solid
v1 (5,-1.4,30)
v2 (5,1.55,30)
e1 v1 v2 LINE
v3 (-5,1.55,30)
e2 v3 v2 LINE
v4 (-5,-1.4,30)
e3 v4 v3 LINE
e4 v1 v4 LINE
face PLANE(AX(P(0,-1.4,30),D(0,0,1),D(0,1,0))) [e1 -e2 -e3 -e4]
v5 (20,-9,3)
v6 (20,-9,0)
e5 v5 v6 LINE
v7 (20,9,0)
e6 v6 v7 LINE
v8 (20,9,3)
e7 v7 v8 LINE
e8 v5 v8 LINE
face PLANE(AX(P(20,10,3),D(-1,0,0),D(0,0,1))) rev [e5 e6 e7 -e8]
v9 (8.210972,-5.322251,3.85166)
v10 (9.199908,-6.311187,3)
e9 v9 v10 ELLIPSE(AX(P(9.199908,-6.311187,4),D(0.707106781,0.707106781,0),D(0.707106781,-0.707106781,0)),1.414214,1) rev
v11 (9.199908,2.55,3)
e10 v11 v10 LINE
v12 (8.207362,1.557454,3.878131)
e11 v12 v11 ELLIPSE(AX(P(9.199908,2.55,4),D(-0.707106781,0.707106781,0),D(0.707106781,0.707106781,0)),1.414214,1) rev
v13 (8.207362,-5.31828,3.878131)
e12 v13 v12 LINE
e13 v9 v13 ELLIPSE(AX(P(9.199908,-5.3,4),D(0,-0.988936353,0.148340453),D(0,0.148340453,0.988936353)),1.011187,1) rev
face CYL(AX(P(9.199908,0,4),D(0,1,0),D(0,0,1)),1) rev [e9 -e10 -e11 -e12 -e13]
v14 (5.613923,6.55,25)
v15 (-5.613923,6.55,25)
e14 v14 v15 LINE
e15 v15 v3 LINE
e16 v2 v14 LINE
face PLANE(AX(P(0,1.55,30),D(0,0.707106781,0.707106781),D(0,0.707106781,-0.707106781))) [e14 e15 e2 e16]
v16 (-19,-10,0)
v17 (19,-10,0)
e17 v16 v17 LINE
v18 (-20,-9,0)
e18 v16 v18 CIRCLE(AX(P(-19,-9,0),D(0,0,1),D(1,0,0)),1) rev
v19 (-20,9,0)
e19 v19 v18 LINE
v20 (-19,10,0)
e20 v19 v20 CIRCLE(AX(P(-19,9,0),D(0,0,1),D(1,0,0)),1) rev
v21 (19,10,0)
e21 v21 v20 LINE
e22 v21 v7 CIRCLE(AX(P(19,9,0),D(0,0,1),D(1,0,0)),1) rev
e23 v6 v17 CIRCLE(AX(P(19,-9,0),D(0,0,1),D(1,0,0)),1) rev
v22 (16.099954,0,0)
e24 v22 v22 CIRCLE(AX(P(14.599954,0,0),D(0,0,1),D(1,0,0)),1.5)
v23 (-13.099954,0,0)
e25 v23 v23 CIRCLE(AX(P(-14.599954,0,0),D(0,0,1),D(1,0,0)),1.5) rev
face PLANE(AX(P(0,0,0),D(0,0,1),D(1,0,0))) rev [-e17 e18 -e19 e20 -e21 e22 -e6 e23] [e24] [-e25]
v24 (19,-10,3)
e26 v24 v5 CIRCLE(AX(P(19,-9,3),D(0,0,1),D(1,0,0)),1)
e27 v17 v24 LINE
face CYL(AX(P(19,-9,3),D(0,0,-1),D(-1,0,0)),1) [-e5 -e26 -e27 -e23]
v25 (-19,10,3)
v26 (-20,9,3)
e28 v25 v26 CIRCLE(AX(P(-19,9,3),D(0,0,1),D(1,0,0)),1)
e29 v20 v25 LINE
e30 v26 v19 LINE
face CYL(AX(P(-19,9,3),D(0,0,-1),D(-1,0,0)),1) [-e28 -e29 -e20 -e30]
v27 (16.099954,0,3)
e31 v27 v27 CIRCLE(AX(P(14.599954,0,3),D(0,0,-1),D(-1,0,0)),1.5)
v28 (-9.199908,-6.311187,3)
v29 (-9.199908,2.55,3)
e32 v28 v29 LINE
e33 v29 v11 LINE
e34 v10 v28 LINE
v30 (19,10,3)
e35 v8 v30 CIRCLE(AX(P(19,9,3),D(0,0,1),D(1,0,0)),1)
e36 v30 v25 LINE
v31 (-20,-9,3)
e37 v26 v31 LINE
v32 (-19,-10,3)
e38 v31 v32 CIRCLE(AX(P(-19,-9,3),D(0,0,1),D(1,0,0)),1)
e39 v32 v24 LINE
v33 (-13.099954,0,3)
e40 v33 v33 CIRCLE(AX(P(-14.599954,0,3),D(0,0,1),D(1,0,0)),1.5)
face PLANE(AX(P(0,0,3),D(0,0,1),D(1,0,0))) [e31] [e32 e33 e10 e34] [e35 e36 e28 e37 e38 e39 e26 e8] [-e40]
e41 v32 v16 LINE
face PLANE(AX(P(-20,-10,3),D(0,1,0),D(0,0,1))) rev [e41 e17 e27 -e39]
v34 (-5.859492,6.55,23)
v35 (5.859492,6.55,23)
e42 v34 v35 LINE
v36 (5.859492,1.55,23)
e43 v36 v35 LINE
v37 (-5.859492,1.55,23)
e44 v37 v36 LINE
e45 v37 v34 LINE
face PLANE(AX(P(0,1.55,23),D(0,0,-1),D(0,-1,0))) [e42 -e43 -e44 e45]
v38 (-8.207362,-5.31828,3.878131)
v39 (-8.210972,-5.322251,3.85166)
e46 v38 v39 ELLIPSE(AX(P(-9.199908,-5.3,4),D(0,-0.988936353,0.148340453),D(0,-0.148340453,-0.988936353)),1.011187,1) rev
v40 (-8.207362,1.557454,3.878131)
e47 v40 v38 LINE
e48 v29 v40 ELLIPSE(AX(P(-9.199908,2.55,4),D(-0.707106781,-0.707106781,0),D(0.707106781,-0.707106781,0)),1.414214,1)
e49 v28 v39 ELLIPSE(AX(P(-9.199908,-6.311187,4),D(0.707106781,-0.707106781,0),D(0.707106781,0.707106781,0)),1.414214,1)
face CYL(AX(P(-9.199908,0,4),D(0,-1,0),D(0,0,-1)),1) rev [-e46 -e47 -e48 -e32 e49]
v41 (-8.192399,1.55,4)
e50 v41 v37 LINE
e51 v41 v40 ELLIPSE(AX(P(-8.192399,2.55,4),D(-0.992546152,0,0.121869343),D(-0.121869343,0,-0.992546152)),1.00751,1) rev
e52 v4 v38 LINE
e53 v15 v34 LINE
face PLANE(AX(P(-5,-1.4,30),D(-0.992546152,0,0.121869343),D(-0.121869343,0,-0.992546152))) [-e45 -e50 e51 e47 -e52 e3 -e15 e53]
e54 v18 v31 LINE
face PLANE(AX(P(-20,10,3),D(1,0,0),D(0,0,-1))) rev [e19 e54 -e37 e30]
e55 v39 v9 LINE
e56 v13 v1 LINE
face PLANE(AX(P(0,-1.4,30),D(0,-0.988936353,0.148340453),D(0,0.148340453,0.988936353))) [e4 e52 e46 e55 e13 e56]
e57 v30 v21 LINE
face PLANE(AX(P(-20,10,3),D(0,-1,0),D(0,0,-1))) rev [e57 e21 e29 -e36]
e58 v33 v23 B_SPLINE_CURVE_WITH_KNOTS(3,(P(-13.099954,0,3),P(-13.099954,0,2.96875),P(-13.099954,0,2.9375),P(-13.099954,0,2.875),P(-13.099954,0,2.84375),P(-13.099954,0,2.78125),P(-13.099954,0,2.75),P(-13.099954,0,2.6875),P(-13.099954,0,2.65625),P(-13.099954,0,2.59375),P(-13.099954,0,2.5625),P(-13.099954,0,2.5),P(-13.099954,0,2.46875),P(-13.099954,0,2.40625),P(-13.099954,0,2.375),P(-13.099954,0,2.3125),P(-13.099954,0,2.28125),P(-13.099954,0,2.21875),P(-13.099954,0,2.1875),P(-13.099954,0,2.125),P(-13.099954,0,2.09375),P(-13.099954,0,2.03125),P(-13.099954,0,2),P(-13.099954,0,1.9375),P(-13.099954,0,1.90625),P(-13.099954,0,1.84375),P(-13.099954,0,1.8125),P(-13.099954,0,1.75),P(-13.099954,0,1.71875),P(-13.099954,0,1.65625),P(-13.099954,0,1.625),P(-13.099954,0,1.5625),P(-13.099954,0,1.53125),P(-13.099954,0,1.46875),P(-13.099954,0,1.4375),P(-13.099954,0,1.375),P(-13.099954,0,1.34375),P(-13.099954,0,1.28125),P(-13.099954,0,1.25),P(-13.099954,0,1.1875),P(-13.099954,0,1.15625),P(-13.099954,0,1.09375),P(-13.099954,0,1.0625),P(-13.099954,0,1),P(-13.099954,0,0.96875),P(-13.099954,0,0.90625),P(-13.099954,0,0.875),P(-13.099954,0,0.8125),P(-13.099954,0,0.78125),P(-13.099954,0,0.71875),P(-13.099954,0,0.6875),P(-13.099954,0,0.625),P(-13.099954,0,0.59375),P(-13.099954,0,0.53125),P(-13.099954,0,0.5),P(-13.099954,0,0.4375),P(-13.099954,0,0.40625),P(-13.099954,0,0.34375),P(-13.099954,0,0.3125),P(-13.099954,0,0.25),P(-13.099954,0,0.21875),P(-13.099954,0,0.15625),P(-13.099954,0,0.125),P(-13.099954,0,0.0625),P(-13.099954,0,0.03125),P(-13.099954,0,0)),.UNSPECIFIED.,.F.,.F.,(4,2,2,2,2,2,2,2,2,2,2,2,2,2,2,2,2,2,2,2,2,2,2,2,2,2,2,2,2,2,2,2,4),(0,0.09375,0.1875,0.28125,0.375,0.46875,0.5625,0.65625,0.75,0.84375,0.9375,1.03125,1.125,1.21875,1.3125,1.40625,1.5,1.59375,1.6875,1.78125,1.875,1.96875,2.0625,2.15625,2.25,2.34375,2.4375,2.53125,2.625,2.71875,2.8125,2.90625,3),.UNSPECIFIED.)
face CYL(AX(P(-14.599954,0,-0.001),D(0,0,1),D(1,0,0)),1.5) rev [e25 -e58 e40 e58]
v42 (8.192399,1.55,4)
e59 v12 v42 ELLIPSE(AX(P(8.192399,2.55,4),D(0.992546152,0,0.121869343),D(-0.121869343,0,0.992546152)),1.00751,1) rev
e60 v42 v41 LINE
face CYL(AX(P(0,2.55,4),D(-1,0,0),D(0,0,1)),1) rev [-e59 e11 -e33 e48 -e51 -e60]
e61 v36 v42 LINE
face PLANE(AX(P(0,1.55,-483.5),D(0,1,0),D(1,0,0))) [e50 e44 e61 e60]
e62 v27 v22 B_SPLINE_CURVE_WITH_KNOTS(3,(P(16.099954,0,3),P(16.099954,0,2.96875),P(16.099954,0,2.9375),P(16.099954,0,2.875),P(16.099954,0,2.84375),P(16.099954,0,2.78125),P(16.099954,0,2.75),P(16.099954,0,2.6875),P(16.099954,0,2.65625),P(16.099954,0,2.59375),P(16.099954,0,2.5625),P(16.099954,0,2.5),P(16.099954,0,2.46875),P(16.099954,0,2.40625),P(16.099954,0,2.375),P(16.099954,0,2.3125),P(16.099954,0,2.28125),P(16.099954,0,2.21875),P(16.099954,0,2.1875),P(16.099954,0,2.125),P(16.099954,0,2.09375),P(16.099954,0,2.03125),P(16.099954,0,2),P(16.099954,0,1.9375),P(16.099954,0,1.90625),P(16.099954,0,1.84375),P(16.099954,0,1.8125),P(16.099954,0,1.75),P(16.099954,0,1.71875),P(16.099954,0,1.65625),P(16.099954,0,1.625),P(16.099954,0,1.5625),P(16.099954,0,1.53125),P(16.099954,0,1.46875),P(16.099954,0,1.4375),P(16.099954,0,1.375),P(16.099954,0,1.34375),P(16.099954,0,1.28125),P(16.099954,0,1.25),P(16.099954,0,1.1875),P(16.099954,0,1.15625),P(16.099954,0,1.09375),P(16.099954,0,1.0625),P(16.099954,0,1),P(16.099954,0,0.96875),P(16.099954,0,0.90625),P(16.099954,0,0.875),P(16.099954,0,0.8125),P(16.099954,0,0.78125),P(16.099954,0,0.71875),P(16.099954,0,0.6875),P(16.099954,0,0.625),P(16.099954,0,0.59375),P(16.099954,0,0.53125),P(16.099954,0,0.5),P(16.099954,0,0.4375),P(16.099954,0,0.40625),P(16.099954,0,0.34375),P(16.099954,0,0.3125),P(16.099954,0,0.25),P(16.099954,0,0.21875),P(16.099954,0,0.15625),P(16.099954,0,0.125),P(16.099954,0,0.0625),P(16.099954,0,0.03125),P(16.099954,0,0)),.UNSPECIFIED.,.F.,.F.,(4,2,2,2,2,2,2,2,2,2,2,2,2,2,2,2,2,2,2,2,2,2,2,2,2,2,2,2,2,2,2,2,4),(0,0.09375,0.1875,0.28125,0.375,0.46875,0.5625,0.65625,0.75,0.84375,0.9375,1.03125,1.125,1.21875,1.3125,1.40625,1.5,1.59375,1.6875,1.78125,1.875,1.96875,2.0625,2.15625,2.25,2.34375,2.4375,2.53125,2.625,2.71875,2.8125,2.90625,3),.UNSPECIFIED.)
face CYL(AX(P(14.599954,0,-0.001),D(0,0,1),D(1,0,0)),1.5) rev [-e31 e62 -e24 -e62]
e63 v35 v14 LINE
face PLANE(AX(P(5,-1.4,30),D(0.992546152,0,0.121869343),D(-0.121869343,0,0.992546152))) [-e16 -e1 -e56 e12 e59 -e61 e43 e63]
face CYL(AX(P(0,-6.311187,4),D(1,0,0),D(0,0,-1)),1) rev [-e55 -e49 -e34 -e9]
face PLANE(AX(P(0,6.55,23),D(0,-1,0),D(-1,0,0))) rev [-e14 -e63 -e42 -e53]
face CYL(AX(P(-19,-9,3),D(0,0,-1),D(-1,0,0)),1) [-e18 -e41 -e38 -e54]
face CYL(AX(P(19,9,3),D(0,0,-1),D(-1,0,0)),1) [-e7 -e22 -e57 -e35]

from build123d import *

# Parameters (mm, degrees)
SKETCH1_W           = 40
SKETCH1_H           = 20
BOSS_EXTRUDE1_DEPTH = 3
SNAP_START          = -1.4
SNAP_HOOK1_DEPTH    = 2.95
SNAP_START_2        = -8.315183144
SNAP_HOOK1_2_DEPTH  = 16.630366288
SNAP_START_3        = -5.859491926
SNAP_HOOK1_3_DEPTH  = 11.718983852
SNAP_START_4        = -6
SNAP_HOOK1_4_DEPTH  = 14
FILLET1_R           = 1
CUT_EXTRUDE1_REACH  = 37.057
SKETCH3_R           = 1.5
FILLET2_R           = 1


with BuildPart() as part:
    # Sketch1 → Boss-Extrude1 (new body)
    with BuildSketch(Plane.XY):
        Rectangle(SKETCH1_W, SKETCH1_H)
    extrude(amount=BOSS_EXTRUDE1_DEPTH)

    # Snap Hook1: read off the stored shape, not the designer's step
    # Snap Hook1 outline → Snap Hook1 (add)
    with BuildSketch(Plane(origin=(0, 0, 0), x_dir=(1, 0, 0), z_dir=(0, 1, 0)).offset(SNAP_START)):
        Polygon((8.315183144, -3), (-8.315183144, -3), (-5, -30), (5, -30), align=None)
    extrude(amount=SNAP_HOOK1_DEPTH)

    # Snap Hook1 2 outline → Snap Hook1 2 (add)
    with BuildSketch(Plane.YZ.offset(SNAP_START_2)):
        Polygon((-1.4, 3), (-1.4, 30), (-5.45, 3), align=None)
    extrude(amount=SNAP_HOOK1_2_DEPTH)

    # Snap Hook1 3 outline → Snap Hook1 3 (add)
    with BuildSketch(Plane.YZ.offset(SNAP_START_3)):
        Polygon((1.55, 30), (1.55, 23), (6.55, 23), (6.55, 25), align=None)
    extrude(amount=SNAP_HOOK1_3_DEPTH)

    # Snap Hook1 4 outline → Snap Hook1 4 (cut)
    with BuildSketch(Plane(origin=(0, 0, 0), x_dir=(1, 0, 0), z_dir=(0, 1, 0)).offset(SNAP_START_4)):
        Polygon((-8.315183144, -3), (-8.315183144, -31), (-4.877215439, -31), (-5, -30), align=None)
        Polygon((5, -30), (4.877215439, -31), (8.315183144, -31), (8.315183144, -3), align=None)
    extrude(amount=SNAP_HOOK1_4_DEPTH, mode=Mode.SUBTRACT)

    # Fillet1
    # the kernel refuses this fillet: 1 mm, written as the material it adds along each edge
    with BuildSketch(Plane(origin=(10.815183144, 1.55, 3), x_dir=(0, 1, 0), z_dir=(-1, 0, 0))) as fillet1_piece_1_section:
        with BuildLine():
            CenterArc((FILLET1_R, -FILLET1_R), FILLET1_R, 90, 90)
            Line((0, -FILLET1_R), (0, 0))
            Line((0, 0), (FILLET1_R, 0))
        make_face()
    fillet1_piece_1 = extrude(amount=21.630366288, mode=Mode.PRIVATE)
    fillet1_piece_1 = split(fillet1_piece_1, bisect_by=Plane(origin=(-8.031056326, 1.55, 5.314027238), z_dir=(0.9925461516430047, 0, -0.12186934339144287)), keep=Keep.TOP, mode=Mode.PRIVATE)
    fillet1_piece_1 = split(fillet1_piece_1, bisect_by=Plane(origin=(8.352313486, 1.55, 2.697597631), z_dir=(-0.9925461516430047, 0, -0.12186934339144287)), keep=Keep.TOP, mode=Mode.PRIVATE)
    add(fillet1_piece_1)
    with BuildSketch(Plane(origin=(8.315183144, 1.55, 3), x_dir=(1, 0, 0), z_dir=(0, -1, 0))) as fillet1_piece_2_section:
        with BuildLine():
            CenterArc((FILLET1_R * 0.884725264568, FILLET1_R), FILLET1_R, 186.999999999, 83.000000001)
            Line((-FILLET1_R * 0.107820887075, FILLET1_R * 0.878130656609), (0, 0))
            Line((0, 0), (FILLET1_R * 0.884725264568, 0))
        make_face()
    fillet1_piece_2 = extrude(amount=9.211813161, mode=Mode.PRIVATE)
    fillet1_piece_2 = split(fillet1_piece_2, bisect_by=Plane(origin=(8.315183144, -5.29596577, 4.026894866), z_dir=(0, 0.9889363528682975, -0.14834045293024464)), keep=Keep.TOP, mode=Mode.PRIVATE)
    add(fillet1_piece_2)
    with BuildSketch(Plane(origin=(-10.468151696, -5.45, 3), x_dir=(0, -1, 0), z_dir=(1, 0, 0))) as fillet1_piece_3_section:
        with BuildLine():
            CenterArc((FILLET1_R * 0.861187420808, -FILLET1_R), FILLET1_R, 90, 81.46923439)
            Line((-FILLET1_R * 0.12774893206, -FILLET1_R * 0.85165954707), (0, 0))
            Line((0, 0), (FILLET1_R * 0.861187420808, 0))
        make_face()
    fillet1_piece_3 = extrude(amount=20.936303392, mode=Mode.PRIVATE)
    fillet1_piece_3 = split(fillet1_piece_3, bisect_by=Plane(origin=(-8.347159328, -5.45, 2.739574883), z_dir=(0.9925461516430047, 0, -0.12186934339144287)), keep=Keep.TOP, mode=Mode.PRIVATE)
    fillet1_piece_3 = split(fillet1_piece_3, bisect_by=Plane(origin=(8.036210484, -5.45, 5.272049985), z_dir=(-0.9925461516430047, 0, -0.12186934339144287)), keep=Keep.TOP, mode=Mode.PRIVATE)
    add(fillet1_piece_3)
    with BuildSketch(Plane(origin=(-8.315183144, -7.661813161, 3), x_dir=(-1, 0, 0), z_dir=(0, 1, 0))) as fillet1_piece_4_section:
        with BuildLine():
            CenterArc((FILLET1_R * 0.884725264568, FILLET1_R), FILLET1_R, 186.999999999, 83.000000001)
            Line((-FILLET1_R * 0.107820887075, FILLET1_R * 0.878130656609), (0, 0))
            Line((0, 0), (FILLET1_R * 0.884725264568, 0))
        make_face()
    fillet1_piece_4 = extrude(amount=9.211813161, mode=Mode.PRIVATE)
    fillet1_piece_4 = split(fillet1_piece_4, bisect_by=Plane(origin=(-8.315183144, -5.498670705, 2.675528632), z_dir=(0, 0.9889363528682975, -0.14834045293024464)), keep=Keep.TOP, mode=Mode.PRIVATE)
    add(fillet1_piece_4)
    with BuildSketch(Plane(origin=(8.315183144, 3.761813161, 3), x_dir=(1, 0, 0), z_dir=(0, -1, 0))) as fillet1_piece_5a_section:
        with BuildLine():
            CenterArc((FILLET1_R * 0.884725264568, FILLET1_R), FILLET1_R, 186.999999999, 83.000000001)
            Line((-FILLET1_R * 0.107820887075, FILLET1_R * 0.878130656609), (0, 0))
            Line((0, 0), (FILLET1_R * 0.884725264568, 0))
        make_face()
    fillet1_piece_5a = extrude(amount=11.423626323, mode=Mode.PRIVATE)
    fillet1_piece_5a = split(fillet1_piece_5a, bisect_by=Plane(origin=(8.315183144, 1.55, 3), z_dir=(0, 1, 0)), keep=Keep.TOP, mode=Mode.PRIVATE)
    with BuildSketch(Plane(origin=(10.815183144, 1.55, 3), x_dir=(0, 1, 0), z_dir=(-1, 0, 0))) as fillet1_piece_5b_section:
        with BuildLine():
            CenterArc((FILLET1_R, -FILLET1_R), FILLET1_R, 90, 90)
            Line((0, -FILLET1_R), (0, 0))
            Line((0, 0), (FILLET1_R, 0))
        make_face()
    fillet1_piece_5b = extrude(amount=21.630366288, mode=Mode.PRIVATE)
    fillet1_piece_5b = split(fillet1_piece_5b, bisect_by=Plane(origin=(8.352313486, 1.55, 2.697597631), z_dir=(0.9925461516430047, 0, 0.12186934339144287)), keep=Keep.TOP, mode=Mode.PRIVATE)
    fillet1_piece_5 = fillet1_piece_5a & fillet1_piece_5b
    add(fillet1_piece_5)
    with BuildSketch(Plane(origin=(10.815183144, 1.55, 3), x_dir=(0, 1, 0), z_dir=(-1, 0, 0))) as fillet1_piece_6a_section:
        with BuildLine():
            CenterArc((FILLET1_R, -FILLET1_R), FILLET1_R, 90, 90)
            Line((0, -FILLET1_R), (0, 0))
            Line((0, 0), (FILLET1_R, 0))
        make_face()
    fillet1_piece_6a = extrude(amount=21.630366288, mode=Mode.PRIVATE)
    fillet1_piece_6a = split(fillet1_piece_6a, bisect_by=Plane(origin=(-8.031056326, 1.55, 5.314027238), z_dir=(-0.9925461516430047, 0, 0.12186934339144287)), keep=Keep.TOP, mode=Mode.PRIVATE)
    with BuildSketch(Plane(origin=(-8.315183144, -7.661813161, 3), x_dir=(-1, 0, 0), z_dir=(0, 1, 0))) as fillet1_piece_6b_section:
        with BuildLine():
            CenterArc((FILLET1_R * 0.884725264568, FILLET1_R), FILLET1_R, 186.999999999, 83.000000001)
            Line((-FILLET1_R * 0.107820887075, FILLET1_R * 0.878130656609), (0, 0))
            Line((0, 0), (FILLET1_R * 0.884725264568, 0))
        make_face()
    fillet1_piece_6b = extrude(amount=11.423626323, mode=Mode.PRIVATE)
    fillet1_piece_6b = split(fillet1_piece_6b, bisect_by=Plane(origin=(-8.315183144, 1.55, 3), z_dir=(0, 1, 0)), keep=Keep.TOP, mode=Mode.PRIVATE)
    fillet1_piece_6 = fillet1_piece_6a & fillet1_piece_6b
    add(fillet1_piece_6)
    with BuildSketch(Plane(origin=(-10.468151696, -5.45, 3), x_dir=(0, -1, 0), z_dir=(1, 0, 0))) as fillet1_piece_7a_section:
        with BuildLine():
            CenterArc((FILLET1_R * 0.861187420808, -FILLET1_R), FILLET1_R, 90, 81.46923439)
            Line((-FILLET1_R * 0.12774893206, -FILLET1_R * 0.85165954707), (0, 0))
            Line((0, 0), (FILLET1_R * 0.861187420808, 0))
        make_face()
    fillet1_piece_7a = extrude(amount=20.936303392, mode=Mode.PRIVATE)
    fillet1_piece_7a = split(fillet1_piece_7a, bisect_by=Plane(origin=(8.036210484, -5.45, 5.272049985), z_dir=(0.9925461516430047, 0, 0.12186934339144287)), keep=Keep.TOP, mode=Mode.PRIVATE)
    with BuildSketch(Plane(origin=(8.315183144, 1.55, 3), x_dir=(1, 0, 0), z_dir=(0, -1, 0))) as fillet1_piece_7b_section:
        with BuildLine():
            CenterArc((FILLET1_R * 0.884725264568, FILLET1_R), FILLET1_R, 186.999999999, 83.000000001)
            Line((-FILLET1_R * 0.107820887075, FILLET1_R * 0.878130656609), (0, 0))
            Line((0, 0), (FILLET1_R * 0.884725264568, 0))
        make_face()
    fillet1_piece_7b = extrude(amount=9.211813161, mode=Mode.PRIVATE)
    fillet1_piece_7b = split(fillet1_piece_7b, bisect_by=Plane(origin=(8.315183144, -5.29596577, 4.026894866), z_dir=(0, -0.9889363528682975, 0.14834045293024464)), keep=Keep.TOP, mode=Mode.PRIVATE)
    fillet1_piece_7 = fillet1_piece_7a & fillet1_piece_7b
    add(fillet1_piece_7)
    with BuildSketch(Plane(origin=(-10.468151696, -5.45, 3), x_dir=(0, -1, 0), z_dir=(1, 0, 0))) as fillet1_piece_8a_section:
        with BuildLine():
            CenterArc((FILLET1_R * 0.861187420808, -FILLET1_R), FILLET1_R, 90, 81.46923439)
            Line((-FILLET1_R * 0.12774893206, -FILLET1_R * 0.85165954707), (0, 0))
            Line((0, 0), (FILLET1_R * 0.861187420808, 0))
        make_face()
    fillet1_piece_8a = extrude(amount=20.936303392, mode=Mode.PRIVATE)
    fillet1_piece_8a = split(fillet1_piece_8a, bisect_by=Plane(origin=(-8.347159328, -5.45, 2.739574883), z_dir=(-0.9925461516430047, 0, 0.12186934339144287)), keep=Keep.TOP, mode=Mode.PRIVATE)
    with BuildSketch(Plane(origin=(-8.315183144, -7.661813161, 3), x_dir=(-1, 0, 0), z_dir=(0, 1, 0))) as fillet1_piece_8b_section:
        with BuildLine():
            CenterArc((FILLET1_R * 0.884725264568, FILLET1_R), FILLET1_R, 186.999999999, 83.000000001)
            Line((-FILLET1_R * 0.107820887075, FILLET1_R * 0.878130656609), (0, 0))
            Line((0, 0), (FILLET1_R * 0.884725264568, 0))
        make_face()
    fillet1_piece_8b = extrude(amount=9.211813161, mode=Mode.PRIVATE)
    fillet1_piece_8b = split(fillet1_piece_8b, bisect_by=Plane(origin=(-8.315183144, -5.498670705, 2.675528632), z_dir=(0, -0.9889363528682975, 0.14834045293024464)), keep=Keep.TOP, mode=Mode.PRIVATE)
    fillet1_piece_8 = fillet1_piece_8a & fillet1_piece_8b
    add(fillet1_piece_8)

    # Sketch3 → Cut-Extrude1 (cut, up to next)
    with BuildSketch(Plane.XY.offset(3), mode=Mode.PRIVATE) as cut_extrude1_sk1:
        with Locations((-14.599954204, 0)):
            Circle(SKETCH3_R)
    cut_extrude1_tool1 = extrude(cut_extrude1_sk1.sketch, amount=-CUT_EXTRUDE1_REACH, mode=Mode.PRIVATE) & part.part
    cut_extrude1 = cut_extrude1_tool1.solids().sort_by_distance((-14.599954, 0, 3))[0]
    add(cut_extrude1, mode=Mode.SUBTRACT)

    # Mirror1: Cut-Extrude1 across plane
    add(cut_extrude1.mirror(Plane(origin=(0, 0, 0), x_dir=(0, 0, 1), z_dir=(1, 0, 0))), mode=Mode.SUBTRACT)

    # Fillet2
    fillet2_edges = [part.edges().sort_by_distance(p)[0] for p in [
        (20, -10, 1.5),
        (-20, -10, 1.5),
        (-20, 10, 1.5),
        (20, 10, 1.5),
    ]]
    fillet(fillet2_edges, radius=FILLET2_R)


solid = part.part
